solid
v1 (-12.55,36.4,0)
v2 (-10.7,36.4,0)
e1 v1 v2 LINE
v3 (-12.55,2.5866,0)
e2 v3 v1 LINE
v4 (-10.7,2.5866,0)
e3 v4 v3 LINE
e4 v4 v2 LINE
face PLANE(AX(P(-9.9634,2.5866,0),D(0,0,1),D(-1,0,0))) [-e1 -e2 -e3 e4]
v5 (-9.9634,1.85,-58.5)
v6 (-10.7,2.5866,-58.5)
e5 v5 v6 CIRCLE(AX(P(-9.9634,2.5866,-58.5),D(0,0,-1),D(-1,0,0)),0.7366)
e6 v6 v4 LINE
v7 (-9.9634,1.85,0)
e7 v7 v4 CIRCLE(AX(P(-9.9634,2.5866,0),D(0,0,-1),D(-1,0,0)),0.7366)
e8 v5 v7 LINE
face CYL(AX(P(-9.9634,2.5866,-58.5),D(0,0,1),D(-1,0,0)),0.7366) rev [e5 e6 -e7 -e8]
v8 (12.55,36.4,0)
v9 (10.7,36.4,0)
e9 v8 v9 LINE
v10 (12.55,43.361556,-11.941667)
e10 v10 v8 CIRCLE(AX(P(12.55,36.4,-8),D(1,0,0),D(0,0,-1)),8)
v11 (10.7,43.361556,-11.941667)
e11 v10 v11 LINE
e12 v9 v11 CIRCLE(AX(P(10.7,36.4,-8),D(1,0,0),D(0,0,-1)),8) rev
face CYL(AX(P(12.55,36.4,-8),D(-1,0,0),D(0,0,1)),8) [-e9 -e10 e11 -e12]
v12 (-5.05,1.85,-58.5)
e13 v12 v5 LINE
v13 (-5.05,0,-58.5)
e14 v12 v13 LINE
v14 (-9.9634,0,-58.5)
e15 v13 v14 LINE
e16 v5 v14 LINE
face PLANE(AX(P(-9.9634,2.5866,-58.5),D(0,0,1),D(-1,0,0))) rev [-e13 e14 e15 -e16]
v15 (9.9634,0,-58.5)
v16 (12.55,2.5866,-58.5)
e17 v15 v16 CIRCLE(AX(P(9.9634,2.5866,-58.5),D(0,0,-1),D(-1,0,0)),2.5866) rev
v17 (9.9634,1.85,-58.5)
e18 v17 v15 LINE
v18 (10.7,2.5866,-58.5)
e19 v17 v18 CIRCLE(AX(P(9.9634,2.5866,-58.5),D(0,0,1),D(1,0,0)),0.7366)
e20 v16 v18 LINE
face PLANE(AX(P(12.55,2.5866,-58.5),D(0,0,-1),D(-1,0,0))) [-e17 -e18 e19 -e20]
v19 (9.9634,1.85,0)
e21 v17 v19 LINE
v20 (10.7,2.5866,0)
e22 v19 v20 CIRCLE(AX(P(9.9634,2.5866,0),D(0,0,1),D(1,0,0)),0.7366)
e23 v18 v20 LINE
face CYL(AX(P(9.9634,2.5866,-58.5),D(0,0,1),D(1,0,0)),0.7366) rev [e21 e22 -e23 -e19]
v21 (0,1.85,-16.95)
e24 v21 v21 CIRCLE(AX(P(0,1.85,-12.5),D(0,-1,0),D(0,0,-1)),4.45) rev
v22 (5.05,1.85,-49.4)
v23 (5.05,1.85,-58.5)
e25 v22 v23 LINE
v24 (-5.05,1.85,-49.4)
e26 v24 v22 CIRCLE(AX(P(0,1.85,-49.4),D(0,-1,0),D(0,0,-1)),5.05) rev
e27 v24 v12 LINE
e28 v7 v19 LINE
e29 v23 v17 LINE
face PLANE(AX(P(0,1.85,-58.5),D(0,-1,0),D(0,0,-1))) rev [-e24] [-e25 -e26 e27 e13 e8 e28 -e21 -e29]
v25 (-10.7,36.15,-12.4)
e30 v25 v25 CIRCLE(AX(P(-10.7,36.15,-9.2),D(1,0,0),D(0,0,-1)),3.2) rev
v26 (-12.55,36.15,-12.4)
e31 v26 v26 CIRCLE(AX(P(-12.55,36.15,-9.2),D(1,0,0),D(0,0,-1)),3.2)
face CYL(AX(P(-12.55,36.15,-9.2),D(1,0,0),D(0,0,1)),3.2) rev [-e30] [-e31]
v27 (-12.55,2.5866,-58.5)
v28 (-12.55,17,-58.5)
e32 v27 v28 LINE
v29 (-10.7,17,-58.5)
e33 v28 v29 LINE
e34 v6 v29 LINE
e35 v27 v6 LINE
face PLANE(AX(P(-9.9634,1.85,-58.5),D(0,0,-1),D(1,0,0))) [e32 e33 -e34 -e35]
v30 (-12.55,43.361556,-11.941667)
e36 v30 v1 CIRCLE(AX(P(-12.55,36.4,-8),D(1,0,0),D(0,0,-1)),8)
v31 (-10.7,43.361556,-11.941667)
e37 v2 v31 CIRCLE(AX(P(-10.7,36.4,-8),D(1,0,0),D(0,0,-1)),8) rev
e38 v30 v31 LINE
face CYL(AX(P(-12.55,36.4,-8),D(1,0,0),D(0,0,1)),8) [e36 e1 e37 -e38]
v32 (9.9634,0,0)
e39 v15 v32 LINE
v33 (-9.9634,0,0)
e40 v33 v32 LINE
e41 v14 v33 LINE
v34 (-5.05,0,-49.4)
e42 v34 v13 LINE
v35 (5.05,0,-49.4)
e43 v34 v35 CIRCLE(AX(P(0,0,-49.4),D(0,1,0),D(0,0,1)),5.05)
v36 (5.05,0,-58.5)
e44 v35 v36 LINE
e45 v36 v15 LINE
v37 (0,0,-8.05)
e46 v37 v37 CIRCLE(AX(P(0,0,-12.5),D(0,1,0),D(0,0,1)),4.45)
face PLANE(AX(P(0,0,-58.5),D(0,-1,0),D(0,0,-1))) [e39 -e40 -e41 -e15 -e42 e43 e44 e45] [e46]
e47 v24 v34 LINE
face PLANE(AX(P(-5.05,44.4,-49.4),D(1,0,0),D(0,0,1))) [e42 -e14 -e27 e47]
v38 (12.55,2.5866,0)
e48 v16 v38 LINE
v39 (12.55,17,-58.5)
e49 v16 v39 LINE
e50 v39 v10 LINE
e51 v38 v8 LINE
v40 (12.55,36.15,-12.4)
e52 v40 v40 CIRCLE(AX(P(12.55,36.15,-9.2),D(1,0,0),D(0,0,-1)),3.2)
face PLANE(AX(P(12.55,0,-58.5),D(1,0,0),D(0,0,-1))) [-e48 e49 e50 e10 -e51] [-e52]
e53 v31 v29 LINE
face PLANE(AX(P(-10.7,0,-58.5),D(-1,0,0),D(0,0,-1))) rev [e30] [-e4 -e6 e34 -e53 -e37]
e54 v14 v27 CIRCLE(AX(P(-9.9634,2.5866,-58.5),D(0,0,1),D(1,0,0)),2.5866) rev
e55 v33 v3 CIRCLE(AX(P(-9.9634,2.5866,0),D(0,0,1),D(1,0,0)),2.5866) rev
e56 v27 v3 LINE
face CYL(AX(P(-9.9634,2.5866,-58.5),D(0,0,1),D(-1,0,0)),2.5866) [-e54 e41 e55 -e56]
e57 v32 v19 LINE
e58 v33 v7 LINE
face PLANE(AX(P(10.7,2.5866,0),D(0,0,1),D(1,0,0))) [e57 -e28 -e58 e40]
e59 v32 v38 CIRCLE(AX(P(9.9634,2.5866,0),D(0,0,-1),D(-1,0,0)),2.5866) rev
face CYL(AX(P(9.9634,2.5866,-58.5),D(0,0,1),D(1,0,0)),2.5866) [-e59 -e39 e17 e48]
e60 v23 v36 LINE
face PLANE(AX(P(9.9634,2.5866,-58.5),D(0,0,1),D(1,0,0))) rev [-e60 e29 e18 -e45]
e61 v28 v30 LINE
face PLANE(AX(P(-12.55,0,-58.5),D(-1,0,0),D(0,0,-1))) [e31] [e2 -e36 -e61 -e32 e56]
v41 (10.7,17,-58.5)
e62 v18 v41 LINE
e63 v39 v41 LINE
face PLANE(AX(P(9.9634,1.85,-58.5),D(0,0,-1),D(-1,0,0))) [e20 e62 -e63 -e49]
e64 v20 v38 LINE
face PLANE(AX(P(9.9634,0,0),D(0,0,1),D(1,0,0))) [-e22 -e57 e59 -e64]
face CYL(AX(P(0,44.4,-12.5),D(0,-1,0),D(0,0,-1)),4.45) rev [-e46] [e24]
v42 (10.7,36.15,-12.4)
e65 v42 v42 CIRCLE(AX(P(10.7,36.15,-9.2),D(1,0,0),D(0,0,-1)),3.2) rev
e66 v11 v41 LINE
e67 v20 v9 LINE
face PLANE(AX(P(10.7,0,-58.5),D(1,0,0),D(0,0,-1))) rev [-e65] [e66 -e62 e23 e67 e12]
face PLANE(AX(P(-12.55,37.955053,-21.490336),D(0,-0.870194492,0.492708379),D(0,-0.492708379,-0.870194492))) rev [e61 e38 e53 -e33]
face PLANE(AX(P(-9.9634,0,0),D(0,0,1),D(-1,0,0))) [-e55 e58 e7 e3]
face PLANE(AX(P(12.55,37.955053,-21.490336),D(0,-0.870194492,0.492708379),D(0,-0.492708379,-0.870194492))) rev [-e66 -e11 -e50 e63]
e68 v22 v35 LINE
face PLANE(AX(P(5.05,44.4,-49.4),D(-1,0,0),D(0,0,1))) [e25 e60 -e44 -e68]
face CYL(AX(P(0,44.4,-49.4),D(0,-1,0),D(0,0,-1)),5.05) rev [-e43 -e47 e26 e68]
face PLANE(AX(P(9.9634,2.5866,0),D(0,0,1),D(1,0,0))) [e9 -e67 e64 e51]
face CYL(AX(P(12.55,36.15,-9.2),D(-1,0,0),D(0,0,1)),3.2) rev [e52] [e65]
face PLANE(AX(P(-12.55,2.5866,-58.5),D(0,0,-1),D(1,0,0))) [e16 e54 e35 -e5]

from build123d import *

# Parameters (mm, degrees)
BASE_FLANGE1_START = -58.5
BASE_FLANGE1_DEPTH = 58.5
SKETCH7_R          = 3.2
CUT_EXTRUDE1_DEPTH = 75.505788366
SKETCH8_R          = 4.45
CUT_EXTRUDE2_DEPTH = 75.505788366


# Read off the part's stored shape, not the designer's step: Base-Flange1
with BuildPart() as part:
    # Base-Flange1 outline → Base-Flange1 (new body)
    with BuildSketch(Plane.XY.offset(BASE_FLANGE1_START)):
        with BuildLine():
            ThreePointArc((9.9634, 0), (11.7924024, 0.7575976), (12.55, 2.5866))
            Line((12.55, 2.5866), (12.55, 44.4))
            Line((12.55, 44.4), (10.7, 44.4))
            Line((10.7, 44.4), (10.7, 2.5866))
            ThreePointArc((10.7, 2.5866), (10.484254855, 2.065745145), (9.9634, 1.85))
            Line((9.9634, 1.85), (0, 1.85))
            Line((0, 1.85), (0, 0))
            Line((0, 0), (9.9634, 0))
        make_face()
    extrude(amount=BASE_FLANGE1_DEPTH)

    # Sketch7 → Cut-Extrude1 (cut, through all)
    with BuildSketch(Plane(origin=(0, 0, 0), x_dir=(0, 0, -1), z_dir=(1, 0, 0))):
        with BuildLine():
            Line((11.941667032, 43.361555933), (58.5, 17))
            Line((58.5, 17), (58.5, 44.4))
            Line((58.5, 44.4), (8, 44.4))
            ThreePointArc((8, 44.4), (10.038081516, 44.136034109), (11.941667032, 43.361555933))
        make_face()
        with BuildLine():
            ThreePointArc((0, 36.4), (2.343145751, 42.056854249), (8, 44.4))
            Line((8, 44.4), (0, 44.4))
            Line((0, 44.4), (0, 36.4))
        make_face()
        with Locations((9.2, 36.15)):
            Circle(SKETCH7_R)
    extrude(amount=CUT_EXTRUDE1_DEPTH, mode=Mode.SUBTRACT)

    # Sketch8 → Cut-Extrude2 (cut, through all)
    with BuildSketch(Plane(origin=(0, 0, 0), x_dir=(1, 0, 0), z_dir=(0, 1, 0))):
        with Locations((0, 12.5)):
            Circle(SKETCH8_R)
        with BuildLine():
            Line((-5.05, 49.4), (-5.05, 58.5))
            ThreePointArc((-5.05, 58.5), (0, 63.55), (5.05, 58.5))
            Line((5.05, 58.5), (5.05, 49.4))
            ThreePointArc((5.05, 49.4), (0, 44.35), (-5.05, 49.4))
        make_face()
    extrude(amount=CUT_EXTRUDE2_DEPTH, mode=Mode.SUBTRACT)

    # Mirror1: part across plane


with BuildPart() as part_1:
    add(part.part)
    add(part.part.mirror(Plane(origin=(0, 0, -58.5), x_dir=(0, 0, 1), z_dir=(1, 0, 0))))


solid = part_1.part
